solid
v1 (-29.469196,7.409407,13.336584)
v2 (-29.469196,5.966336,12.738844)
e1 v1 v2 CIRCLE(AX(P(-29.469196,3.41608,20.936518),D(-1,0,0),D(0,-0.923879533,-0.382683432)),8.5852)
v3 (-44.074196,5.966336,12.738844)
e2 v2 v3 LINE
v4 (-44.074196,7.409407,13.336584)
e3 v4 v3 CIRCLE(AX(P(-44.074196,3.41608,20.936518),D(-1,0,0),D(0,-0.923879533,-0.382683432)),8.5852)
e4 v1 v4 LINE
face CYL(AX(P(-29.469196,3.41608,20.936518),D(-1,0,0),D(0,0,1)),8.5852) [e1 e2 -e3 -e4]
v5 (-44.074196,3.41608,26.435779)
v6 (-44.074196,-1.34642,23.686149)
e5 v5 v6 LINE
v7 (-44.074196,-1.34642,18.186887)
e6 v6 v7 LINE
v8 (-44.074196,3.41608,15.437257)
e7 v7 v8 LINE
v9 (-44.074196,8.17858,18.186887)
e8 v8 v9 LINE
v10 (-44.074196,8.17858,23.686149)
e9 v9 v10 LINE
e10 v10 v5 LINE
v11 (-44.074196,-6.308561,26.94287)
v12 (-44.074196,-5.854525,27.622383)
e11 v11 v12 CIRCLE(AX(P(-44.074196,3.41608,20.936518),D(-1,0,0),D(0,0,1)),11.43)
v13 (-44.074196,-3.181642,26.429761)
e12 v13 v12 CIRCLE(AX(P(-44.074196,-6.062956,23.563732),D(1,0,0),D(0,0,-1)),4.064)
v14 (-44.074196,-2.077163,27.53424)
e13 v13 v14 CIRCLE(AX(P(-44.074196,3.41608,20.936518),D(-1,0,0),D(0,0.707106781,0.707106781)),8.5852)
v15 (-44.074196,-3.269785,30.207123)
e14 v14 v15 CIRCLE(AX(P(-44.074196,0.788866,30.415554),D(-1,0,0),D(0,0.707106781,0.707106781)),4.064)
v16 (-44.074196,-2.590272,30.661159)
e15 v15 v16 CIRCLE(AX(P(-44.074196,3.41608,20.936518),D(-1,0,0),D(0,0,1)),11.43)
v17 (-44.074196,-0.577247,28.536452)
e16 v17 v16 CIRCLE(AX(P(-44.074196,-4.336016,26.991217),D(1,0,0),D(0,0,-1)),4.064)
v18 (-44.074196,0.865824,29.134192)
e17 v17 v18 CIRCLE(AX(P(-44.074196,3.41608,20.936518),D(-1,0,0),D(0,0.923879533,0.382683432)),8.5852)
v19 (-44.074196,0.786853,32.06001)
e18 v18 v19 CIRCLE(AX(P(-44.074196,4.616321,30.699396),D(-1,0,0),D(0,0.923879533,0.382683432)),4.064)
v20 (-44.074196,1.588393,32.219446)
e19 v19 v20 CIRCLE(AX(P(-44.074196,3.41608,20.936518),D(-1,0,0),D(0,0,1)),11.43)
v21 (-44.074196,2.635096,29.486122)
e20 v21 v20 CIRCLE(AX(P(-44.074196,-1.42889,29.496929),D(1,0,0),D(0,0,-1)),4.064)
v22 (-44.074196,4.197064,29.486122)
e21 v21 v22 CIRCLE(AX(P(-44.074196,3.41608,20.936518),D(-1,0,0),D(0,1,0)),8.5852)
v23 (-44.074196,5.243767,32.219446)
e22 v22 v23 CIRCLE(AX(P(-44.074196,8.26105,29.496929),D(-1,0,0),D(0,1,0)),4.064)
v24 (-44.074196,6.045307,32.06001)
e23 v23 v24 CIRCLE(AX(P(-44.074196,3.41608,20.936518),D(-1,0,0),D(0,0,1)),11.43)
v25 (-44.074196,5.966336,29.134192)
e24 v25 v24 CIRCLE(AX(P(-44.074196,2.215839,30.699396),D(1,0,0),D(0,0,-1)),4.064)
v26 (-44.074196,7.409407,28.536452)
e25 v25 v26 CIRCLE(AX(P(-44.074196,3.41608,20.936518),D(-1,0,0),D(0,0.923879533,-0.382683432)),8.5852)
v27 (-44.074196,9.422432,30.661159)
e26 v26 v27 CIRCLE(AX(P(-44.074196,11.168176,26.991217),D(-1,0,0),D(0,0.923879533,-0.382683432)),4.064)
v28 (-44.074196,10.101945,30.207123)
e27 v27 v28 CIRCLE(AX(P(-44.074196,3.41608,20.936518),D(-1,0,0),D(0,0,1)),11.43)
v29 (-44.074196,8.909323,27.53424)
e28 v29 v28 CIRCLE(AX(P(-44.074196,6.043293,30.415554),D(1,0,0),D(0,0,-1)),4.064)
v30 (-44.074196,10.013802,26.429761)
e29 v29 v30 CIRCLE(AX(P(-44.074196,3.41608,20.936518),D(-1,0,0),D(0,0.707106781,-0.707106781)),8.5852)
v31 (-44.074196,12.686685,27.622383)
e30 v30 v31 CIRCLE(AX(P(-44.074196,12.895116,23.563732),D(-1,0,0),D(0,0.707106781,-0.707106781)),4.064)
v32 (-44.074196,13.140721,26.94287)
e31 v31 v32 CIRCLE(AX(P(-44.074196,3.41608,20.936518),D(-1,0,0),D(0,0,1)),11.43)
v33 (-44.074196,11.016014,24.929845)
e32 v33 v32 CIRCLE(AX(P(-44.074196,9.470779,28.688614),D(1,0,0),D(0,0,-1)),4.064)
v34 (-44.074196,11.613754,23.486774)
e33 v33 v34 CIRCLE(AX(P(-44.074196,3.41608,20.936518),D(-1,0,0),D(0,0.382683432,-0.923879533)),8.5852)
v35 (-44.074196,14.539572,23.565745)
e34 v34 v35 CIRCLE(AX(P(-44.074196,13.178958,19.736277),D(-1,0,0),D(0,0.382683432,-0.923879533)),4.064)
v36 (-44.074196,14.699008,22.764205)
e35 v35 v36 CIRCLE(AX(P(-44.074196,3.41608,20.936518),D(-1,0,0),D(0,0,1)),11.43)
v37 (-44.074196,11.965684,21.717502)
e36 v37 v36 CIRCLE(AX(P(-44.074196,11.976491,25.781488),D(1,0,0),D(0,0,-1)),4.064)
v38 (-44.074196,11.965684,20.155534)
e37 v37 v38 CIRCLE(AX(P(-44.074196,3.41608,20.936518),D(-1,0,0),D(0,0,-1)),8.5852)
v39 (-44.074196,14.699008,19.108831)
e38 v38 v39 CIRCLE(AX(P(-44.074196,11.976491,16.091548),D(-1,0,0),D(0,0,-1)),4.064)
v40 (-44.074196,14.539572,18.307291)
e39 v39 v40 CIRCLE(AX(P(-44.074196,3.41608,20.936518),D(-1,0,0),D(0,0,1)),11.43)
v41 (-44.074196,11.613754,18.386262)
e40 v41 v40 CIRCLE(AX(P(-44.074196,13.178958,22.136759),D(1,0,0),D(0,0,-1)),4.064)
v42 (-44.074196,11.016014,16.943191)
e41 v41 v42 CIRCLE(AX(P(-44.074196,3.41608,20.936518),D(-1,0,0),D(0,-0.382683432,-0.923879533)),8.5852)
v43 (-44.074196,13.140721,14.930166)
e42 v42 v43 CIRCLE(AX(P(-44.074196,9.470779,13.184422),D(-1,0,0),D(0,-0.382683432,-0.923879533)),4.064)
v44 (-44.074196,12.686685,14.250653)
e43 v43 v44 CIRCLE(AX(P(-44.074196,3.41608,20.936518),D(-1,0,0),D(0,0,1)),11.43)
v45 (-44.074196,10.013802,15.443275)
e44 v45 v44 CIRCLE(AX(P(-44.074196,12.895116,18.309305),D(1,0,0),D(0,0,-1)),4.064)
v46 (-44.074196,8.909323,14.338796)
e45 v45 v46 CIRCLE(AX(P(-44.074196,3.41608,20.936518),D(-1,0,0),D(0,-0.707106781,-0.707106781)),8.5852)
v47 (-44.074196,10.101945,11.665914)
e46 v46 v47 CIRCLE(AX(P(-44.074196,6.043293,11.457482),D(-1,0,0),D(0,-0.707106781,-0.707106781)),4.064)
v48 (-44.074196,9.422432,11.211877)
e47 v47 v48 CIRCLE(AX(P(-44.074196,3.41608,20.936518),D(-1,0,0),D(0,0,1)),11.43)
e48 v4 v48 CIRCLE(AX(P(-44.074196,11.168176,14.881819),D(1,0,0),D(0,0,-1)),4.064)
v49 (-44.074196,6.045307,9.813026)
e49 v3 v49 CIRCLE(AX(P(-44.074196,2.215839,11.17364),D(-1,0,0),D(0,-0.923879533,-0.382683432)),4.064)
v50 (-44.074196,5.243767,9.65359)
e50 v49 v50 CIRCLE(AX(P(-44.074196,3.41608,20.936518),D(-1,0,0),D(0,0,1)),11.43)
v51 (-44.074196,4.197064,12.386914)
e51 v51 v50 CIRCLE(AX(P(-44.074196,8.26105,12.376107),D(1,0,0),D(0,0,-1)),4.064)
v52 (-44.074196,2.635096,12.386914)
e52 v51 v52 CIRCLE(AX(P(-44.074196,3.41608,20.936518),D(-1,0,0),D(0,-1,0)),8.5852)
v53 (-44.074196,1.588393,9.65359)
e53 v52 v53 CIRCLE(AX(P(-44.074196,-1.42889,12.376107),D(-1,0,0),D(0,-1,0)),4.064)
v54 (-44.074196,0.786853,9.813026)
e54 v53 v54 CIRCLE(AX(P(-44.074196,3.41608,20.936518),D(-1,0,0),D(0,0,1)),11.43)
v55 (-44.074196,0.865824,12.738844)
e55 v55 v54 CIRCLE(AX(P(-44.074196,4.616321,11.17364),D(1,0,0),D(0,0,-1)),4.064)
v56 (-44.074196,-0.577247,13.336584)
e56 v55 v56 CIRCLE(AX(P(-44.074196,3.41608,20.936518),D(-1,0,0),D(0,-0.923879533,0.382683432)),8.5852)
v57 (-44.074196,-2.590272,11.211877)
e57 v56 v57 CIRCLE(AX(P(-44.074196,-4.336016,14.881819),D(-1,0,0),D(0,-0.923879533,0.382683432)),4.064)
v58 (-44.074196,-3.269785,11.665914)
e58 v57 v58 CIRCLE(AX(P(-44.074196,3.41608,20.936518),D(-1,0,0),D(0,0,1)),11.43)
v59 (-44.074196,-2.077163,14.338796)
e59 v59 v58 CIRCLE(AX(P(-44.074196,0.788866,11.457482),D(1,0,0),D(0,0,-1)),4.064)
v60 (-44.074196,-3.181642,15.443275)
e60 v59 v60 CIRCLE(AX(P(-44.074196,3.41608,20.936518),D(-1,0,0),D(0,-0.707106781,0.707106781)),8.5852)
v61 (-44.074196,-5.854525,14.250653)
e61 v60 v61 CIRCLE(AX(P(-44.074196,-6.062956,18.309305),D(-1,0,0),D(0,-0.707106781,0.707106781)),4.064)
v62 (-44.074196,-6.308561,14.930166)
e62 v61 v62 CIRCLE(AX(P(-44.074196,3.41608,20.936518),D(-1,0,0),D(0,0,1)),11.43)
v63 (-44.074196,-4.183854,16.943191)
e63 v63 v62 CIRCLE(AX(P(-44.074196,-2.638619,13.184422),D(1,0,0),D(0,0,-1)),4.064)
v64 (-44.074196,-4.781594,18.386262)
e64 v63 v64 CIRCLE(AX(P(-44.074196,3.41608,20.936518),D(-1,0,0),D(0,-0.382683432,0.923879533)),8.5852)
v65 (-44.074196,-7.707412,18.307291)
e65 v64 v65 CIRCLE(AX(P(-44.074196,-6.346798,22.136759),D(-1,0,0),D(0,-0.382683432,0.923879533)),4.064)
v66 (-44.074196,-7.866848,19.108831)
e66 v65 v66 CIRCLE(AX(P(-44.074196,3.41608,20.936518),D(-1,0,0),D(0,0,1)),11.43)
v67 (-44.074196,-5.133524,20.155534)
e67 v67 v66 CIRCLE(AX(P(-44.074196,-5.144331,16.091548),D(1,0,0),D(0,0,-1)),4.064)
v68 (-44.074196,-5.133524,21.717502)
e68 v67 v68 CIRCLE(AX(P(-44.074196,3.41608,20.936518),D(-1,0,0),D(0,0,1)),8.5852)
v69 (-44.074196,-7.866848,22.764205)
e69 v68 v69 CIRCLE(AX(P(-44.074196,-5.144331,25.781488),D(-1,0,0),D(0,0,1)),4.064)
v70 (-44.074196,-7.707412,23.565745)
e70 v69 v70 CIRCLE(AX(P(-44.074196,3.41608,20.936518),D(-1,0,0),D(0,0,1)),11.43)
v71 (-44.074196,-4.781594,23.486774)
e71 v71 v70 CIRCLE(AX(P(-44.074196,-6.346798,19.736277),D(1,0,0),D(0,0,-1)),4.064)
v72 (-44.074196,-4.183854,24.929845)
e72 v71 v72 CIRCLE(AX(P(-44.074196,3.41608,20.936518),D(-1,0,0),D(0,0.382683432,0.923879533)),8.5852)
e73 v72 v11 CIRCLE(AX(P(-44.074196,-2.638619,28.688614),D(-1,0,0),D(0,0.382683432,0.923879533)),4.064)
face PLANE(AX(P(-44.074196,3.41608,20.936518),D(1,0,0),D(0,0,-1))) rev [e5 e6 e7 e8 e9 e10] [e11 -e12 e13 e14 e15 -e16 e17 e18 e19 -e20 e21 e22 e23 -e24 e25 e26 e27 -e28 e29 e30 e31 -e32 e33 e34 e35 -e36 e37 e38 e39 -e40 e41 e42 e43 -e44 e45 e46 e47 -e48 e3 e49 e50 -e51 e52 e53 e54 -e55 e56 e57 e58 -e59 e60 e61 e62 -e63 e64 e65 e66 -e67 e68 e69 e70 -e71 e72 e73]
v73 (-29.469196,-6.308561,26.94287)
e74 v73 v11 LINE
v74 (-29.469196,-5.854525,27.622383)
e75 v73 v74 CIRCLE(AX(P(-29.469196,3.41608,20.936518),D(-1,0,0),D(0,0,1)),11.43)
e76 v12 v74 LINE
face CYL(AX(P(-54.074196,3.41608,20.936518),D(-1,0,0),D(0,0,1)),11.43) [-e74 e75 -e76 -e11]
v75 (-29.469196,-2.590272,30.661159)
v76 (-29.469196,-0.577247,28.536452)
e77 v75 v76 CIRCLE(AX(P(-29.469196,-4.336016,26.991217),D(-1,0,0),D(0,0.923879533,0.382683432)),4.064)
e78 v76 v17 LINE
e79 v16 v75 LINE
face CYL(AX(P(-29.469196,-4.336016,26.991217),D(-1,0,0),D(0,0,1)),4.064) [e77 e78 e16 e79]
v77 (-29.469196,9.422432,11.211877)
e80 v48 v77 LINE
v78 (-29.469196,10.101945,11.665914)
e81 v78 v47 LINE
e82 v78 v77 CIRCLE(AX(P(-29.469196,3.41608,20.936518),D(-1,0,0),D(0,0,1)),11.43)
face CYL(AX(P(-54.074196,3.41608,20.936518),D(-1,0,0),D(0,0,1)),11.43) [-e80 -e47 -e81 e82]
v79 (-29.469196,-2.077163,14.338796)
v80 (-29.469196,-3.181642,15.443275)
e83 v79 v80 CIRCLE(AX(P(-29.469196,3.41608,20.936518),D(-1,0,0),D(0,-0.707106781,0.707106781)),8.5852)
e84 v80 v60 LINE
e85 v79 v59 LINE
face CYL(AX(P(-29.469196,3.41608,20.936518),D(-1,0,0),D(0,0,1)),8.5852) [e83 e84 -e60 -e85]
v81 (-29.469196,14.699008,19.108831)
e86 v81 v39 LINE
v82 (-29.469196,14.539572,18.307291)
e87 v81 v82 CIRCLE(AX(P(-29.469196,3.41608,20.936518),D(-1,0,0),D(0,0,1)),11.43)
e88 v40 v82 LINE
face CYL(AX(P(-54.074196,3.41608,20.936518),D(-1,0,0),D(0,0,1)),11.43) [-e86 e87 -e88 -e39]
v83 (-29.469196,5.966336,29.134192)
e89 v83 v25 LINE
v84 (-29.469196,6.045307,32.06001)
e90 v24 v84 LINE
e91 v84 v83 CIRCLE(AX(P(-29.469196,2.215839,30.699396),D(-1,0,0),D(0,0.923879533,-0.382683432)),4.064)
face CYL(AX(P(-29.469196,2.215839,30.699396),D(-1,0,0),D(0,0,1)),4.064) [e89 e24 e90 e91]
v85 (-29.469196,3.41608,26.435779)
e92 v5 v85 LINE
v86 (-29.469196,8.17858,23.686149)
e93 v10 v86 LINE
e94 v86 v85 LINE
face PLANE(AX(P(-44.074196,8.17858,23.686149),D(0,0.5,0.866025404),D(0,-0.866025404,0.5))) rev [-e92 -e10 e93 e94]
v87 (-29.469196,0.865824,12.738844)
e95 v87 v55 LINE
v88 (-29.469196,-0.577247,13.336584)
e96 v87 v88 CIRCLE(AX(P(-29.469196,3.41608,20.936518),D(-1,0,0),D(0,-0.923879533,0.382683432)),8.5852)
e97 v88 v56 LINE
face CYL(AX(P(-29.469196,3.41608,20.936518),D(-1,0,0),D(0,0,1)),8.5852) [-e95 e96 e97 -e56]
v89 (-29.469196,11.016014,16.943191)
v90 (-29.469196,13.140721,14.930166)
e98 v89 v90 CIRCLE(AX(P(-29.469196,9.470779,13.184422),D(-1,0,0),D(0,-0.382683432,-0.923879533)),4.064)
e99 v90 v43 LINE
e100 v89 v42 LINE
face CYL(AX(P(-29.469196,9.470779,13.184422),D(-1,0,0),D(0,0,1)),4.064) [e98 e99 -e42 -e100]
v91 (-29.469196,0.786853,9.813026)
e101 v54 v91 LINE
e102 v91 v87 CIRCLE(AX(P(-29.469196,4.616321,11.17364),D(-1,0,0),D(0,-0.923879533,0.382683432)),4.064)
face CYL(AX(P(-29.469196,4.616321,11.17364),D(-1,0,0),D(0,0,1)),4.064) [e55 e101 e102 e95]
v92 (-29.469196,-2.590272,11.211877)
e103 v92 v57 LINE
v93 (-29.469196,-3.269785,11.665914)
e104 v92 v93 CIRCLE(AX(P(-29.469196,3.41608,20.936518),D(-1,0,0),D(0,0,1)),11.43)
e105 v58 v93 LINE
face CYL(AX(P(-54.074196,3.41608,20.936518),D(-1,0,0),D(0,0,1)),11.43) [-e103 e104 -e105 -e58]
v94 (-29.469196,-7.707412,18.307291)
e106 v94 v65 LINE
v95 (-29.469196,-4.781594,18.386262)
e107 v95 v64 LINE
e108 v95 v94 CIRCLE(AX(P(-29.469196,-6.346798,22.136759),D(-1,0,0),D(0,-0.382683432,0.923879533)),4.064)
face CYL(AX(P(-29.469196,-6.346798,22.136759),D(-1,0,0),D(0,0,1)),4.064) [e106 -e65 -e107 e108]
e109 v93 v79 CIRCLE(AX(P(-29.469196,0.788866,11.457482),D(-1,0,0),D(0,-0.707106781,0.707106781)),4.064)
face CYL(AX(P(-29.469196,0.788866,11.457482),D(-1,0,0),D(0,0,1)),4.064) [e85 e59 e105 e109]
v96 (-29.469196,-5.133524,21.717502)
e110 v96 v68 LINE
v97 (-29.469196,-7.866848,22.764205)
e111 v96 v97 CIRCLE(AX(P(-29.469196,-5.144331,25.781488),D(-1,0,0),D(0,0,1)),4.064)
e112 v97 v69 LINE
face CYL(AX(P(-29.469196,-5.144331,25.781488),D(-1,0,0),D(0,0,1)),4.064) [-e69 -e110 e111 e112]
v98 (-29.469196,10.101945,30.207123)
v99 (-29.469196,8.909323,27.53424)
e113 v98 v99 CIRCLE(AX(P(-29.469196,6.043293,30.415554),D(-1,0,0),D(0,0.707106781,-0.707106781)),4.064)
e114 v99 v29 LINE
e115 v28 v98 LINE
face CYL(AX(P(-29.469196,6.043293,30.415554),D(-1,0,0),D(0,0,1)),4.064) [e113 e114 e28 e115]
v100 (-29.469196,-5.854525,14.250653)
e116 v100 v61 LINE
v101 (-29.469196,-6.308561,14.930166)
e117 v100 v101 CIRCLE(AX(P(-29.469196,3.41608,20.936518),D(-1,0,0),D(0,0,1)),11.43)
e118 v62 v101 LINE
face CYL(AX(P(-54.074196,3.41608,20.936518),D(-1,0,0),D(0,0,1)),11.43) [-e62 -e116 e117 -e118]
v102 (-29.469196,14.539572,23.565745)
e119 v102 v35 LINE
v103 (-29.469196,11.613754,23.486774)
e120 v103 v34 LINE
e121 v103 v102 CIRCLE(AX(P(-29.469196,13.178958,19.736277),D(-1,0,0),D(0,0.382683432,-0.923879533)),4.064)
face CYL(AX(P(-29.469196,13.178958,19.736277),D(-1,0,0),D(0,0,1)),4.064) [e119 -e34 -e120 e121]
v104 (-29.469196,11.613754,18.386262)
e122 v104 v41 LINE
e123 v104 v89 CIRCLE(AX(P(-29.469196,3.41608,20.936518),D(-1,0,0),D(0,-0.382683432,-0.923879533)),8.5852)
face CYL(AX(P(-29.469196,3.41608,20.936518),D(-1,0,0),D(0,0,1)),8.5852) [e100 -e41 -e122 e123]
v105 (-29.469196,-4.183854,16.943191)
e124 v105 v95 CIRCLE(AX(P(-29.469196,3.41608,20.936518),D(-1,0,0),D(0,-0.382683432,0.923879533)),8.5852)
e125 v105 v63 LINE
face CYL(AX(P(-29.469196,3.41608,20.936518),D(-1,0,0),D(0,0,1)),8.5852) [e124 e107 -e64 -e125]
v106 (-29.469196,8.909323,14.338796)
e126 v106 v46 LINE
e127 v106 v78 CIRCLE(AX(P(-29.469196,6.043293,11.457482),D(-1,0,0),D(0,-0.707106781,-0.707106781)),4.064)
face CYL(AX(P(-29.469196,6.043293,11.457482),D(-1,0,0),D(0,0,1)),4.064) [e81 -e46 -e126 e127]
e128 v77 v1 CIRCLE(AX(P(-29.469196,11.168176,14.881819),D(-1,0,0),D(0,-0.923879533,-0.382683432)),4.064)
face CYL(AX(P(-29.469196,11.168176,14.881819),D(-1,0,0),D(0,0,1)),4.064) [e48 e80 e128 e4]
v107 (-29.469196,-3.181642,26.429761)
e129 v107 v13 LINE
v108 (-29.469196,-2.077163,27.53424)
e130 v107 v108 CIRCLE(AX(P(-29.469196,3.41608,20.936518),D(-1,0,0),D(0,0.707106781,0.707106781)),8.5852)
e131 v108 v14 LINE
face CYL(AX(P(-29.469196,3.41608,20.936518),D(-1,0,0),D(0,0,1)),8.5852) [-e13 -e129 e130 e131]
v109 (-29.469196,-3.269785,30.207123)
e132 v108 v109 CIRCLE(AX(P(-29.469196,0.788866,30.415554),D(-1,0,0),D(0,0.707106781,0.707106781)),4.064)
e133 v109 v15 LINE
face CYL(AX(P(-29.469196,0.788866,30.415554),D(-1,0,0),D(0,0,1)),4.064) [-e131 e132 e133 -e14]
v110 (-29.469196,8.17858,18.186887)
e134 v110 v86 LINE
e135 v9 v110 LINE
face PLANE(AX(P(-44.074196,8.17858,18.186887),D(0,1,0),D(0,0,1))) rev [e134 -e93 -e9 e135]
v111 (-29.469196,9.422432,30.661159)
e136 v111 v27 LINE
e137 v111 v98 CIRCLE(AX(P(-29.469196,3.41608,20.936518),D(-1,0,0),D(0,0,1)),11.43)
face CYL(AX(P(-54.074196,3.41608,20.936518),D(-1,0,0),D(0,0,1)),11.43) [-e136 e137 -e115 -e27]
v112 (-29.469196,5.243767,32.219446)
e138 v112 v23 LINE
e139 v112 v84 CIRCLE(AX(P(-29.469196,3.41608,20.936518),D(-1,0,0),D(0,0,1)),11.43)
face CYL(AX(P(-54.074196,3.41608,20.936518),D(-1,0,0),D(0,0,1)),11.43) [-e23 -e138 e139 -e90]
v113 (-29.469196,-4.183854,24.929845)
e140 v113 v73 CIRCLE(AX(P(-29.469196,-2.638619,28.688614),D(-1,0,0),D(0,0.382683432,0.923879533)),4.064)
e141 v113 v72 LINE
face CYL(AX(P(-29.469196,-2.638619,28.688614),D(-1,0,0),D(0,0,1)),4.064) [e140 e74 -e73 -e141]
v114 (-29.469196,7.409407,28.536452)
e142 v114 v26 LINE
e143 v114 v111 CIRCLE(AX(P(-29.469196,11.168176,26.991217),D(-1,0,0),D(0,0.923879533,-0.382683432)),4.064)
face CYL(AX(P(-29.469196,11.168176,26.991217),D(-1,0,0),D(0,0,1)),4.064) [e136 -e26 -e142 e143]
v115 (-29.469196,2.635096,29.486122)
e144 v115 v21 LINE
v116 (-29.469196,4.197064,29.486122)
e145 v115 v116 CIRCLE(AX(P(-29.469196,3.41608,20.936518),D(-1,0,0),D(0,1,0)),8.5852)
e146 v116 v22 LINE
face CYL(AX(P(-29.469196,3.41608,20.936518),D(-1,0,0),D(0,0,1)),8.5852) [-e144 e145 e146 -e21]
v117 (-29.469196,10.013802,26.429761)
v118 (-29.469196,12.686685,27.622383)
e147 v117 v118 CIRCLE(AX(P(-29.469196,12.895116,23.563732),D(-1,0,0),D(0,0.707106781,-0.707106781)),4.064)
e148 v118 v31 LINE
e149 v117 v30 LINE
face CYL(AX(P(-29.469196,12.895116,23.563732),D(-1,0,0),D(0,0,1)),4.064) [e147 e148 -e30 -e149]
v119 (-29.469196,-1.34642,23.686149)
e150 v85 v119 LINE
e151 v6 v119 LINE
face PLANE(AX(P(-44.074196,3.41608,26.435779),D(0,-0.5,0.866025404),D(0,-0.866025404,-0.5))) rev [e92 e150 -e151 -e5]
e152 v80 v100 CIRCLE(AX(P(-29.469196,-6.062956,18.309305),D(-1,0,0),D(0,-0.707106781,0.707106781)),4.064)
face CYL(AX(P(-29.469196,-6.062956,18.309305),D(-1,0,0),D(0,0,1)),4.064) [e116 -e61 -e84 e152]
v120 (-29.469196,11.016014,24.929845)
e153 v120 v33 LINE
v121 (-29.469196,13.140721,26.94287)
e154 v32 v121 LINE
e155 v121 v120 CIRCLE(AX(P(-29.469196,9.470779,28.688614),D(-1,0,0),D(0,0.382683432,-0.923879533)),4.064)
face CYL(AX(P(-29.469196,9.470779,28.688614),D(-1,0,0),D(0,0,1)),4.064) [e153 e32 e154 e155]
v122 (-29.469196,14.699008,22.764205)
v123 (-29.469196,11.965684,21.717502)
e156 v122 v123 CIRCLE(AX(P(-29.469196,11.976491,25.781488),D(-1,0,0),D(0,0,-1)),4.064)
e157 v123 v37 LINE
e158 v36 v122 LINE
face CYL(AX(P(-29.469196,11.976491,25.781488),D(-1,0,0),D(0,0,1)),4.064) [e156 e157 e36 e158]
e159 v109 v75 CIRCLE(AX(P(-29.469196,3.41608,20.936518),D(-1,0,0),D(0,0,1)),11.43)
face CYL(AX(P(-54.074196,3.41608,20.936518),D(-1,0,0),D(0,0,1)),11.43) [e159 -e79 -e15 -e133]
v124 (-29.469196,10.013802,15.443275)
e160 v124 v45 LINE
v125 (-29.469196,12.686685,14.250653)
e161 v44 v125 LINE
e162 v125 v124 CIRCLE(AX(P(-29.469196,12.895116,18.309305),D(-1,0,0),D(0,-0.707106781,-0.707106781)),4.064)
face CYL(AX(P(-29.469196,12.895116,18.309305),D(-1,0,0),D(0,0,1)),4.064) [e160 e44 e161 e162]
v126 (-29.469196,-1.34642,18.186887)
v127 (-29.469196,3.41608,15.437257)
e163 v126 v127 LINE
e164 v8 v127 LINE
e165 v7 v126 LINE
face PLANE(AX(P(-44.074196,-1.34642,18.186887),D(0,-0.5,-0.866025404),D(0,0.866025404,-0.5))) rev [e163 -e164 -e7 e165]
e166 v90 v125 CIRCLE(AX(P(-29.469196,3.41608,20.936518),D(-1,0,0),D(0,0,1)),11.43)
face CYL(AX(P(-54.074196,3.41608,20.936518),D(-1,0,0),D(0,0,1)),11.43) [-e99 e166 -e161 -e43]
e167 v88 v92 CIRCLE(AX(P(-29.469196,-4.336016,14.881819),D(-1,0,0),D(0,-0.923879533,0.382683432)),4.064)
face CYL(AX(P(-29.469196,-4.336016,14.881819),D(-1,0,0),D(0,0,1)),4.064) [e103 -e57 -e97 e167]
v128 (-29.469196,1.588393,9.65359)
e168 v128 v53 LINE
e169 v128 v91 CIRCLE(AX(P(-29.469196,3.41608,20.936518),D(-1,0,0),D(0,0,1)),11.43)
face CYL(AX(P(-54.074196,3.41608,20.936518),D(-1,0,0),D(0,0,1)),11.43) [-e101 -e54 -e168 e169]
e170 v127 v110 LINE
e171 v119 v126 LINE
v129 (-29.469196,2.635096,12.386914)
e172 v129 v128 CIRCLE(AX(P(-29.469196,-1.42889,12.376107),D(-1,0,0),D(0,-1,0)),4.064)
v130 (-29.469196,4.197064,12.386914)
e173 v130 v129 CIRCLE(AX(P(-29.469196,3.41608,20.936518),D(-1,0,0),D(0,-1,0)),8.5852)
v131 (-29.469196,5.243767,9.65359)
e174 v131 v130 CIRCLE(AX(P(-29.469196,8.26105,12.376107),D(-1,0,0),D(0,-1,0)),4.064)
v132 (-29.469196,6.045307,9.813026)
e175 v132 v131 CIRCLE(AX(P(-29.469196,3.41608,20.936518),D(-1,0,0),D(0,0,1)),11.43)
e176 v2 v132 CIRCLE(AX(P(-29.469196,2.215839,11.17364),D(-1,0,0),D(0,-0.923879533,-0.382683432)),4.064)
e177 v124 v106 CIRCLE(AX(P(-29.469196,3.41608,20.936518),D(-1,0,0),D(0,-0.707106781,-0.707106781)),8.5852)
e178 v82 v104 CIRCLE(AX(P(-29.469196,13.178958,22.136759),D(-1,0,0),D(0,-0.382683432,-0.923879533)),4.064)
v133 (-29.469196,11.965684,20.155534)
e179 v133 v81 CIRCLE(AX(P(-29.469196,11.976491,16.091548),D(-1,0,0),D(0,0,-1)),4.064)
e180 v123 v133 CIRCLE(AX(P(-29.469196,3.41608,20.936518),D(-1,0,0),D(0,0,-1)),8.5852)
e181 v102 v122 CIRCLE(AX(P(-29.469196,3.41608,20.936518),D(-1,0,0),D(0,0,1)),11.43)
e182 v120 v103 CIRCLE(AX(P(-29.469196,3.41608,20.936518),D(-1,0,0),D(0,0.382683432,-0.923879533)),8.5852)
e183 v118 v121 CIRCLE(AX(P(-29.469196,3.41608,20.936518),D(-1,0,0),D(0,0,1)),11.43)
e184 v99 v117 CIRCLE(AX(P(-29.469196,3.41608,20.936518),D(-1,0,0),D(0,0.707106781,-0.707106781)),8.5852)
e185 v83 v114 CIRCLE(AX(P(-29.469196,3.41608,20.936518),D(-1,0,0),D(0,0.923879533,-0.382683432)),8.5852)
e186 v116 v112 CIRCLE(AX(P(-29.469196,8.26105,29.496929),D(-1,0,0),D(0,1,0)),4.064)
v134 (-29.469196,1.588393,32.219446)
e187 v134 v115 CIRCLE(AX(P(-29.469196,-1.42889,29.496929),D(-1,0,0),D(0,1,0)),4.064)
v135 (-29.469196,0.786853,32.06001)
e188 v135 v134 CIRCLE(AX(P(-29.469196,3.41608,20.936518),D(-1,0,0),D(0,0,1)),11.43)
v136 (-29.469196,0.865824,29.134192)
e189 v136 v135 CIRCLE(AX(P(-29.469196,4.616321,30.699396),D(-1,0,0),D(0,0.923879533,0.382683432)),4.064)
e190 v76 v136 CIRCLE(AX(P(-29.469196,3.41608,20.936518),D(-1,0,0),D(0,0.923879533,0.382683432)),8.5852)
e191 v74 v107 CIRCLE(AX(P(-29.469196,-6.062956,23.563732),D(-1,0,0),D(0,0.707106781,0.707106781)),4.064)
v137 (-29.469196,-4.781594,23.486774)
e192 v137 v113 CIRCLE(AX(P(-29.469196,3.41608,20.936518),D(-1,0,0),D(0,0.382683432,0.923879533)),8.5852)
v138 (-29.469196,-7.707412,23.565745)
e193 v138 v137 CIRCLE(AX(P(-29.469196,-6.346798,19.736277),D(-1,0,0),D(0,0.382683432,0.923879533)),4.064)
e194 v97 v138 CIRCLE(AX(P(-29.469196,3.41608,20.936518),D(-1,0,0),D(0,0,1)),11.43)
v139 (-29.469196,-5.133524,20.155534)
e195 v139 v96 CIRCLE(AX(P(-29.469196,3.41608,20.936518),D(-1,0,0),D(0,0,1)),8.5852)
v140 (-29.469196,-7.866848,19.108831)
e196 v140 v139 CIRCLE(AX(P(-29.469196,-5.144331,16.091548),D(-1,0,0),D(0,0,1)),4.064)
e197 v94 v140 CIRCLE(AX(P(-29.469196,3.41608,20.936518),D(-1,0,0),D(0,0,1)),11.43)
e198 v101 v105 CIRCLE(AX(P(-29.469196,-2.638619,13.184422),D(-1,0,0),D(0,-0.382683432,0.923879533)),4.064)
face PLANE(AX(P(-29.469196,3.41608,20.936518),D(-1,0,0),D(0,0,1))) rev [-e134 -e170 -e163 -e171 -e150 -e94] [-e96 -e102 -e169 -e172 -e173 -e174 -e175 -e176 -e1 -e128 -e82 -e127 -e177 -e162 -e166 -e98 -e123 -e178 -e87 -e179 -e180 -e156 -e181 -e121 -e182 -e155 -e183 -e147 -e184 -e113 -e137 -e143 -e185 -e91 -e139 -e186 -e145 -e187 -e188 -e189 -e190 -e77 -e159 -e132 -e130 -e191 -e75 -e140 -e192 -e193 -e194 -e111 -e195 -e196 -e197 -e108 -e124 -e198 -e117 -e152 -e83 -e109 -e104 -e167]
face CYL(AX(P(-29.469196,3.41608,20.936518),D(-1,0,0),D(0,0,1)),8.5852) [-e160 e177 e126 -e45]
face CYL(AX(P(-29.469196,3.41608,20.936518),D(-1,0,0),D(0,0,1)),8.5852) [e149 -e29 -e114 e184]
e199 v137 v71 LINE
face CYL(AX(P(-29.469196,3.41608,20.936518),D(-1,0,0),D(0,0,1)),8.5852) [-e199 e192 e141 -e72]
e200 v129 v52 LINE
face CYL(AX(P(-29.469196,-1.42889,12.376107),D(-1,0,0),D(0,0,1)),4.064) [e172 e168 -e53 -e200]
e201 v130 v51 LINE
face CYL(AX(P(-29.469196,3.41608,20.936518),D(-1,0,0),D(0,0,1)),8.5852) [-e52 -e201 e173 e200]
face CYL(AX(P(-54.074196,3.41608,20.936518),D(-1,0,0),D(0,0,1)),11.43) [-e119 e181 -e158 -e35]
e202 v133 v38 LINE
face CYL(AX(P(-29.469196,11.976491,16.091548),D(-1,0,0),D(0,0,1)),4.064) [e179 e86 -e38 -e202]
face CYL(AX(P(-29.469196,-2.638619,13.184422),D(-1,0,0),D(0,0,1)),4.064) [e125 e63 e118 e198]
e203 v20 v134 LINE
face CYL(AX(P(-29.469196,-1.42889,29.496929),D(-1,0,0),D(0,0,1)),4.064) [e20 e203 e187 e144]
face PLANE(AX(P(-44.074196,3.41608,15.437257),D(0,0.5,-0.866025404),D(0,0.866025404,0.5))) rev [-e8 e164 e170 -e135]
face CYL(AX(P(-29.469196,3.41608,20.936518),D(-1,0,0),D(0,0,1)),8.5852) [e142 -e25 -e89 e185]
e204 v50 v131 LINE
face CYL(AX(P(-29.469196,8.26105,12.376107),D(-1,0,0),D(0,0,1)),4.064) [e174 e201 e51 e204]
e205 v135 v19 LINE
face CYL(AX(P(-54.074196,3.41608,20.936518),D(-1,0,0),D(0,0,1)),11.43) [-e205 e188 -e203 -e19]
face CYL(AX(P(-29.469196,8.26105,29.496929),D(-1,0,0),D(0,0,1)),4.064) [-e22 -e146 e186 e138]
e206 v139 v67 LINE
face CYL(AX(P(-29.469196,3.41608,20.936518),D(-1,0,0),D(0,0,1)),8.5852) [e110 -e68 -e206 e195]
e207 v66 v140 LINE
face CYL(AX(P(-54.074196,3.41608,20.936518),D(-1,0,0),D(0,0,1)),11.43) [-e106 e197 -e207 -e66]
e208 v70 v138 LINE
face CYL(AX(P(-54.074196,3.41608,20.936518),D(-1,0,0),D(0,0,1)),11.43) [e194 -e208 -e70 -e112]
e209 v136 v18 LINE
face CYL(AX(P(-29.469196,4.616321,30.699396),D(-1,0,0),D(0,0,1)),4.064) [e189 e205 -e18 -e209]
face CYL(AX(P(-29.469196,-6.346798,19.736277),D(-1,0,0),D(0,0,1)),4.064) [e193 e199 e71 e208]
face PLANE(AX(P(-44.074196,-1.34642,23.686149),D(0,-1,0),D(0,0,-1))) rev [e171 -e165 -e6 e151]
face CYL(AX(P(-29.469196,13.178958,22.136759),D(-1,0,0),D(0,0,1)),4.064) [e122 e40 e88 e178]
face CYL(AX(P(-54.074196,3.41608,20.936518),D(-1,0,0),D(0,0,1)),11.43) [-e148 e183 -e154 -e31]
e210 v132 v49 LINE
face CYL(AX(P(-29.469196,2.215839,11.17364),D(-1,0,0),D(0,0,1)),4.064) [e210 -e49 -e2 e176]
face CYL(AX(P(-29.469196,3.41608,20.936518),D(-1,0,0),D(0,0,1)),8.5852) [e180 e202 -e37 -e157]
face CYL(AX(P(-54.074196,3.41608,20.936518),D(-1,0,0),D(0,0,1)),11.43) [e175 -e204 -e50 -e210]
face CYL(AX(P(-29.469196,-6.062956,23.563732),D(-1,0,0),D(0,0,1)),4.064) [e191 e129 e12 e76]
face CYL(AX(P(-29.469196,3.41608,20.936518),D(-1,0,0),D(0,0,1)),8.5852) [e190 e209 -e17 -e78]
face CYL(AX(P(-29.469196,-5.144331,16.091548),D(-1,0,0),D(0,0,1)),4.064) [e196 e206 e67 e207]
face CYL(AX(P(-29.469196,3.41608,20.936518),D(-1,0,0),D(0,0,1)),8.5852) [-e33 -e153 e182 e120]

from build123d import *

# Parameters (mm, degrees)
SPUR_START             = -44.074195703
SPUR_GEAR_AI_OUTLINE_R = 4.7625
SPUR_GEAR_AI_DEPTH     = 14.605
CUT_EXTRUDE1_DEPTH     = 39.307434666


# Read off the part's stored shape, not the designer's step: spur gear_ai
with BuildPart() as part:
    # spur gear_ai outline → spur gear_ai (new body)
    with BuildSketch(Plane.YZ.offset(SPUR_START)):
        with BuildLine():
            ThreePointArc((12.686684526, 14.250652999), (12.919777657, 14.586350288), (13.140720632, 14.930166051))
            ThreePointArc((13.140720632, 14.930166051), (12.265878987, 16.134593199), (11.016013995, 16.943190851))
            ThreePointArc((11.016013995, 16.943190851), (11.347770551, 17.651104248), (11.613753604, 18.386261921))
            ThreePointArc((11.613753604, 18.386261921), (13.069306498, 18.074238793), (14.539571561, 18.307290937))
            ThreePointArc((14.539571561, 18.307290937), (14.626455743, 18.70663567), (14.699007839, 19.108831233))
            ThreePointArc((14.699007839, 19.108831233), (13.429845234, 19.88678942), (11.965683625, 20.155533616))
            ThreePointArc((11.965683625, 20.155533616), (12.001279988, 20.936518051), (11.965683625, 21.717502486))
            ThreePointArc((11.965683625, 21.717502486), (13.429845234, 21.986246682), (14.699007839, 22.764204869))
            ThreePointArc((14.699007839, 22.764204869), (14.626455743, 23.166400432), (14.539571561, 23.565745165))
            ThreePointArc((14.539571561, 23.565745165), (13.069306498, 23.79879731), (11.613753604, 23.486774182))
            ThreePointArc((11.613753604, 23.486774182), (11.347770551, 24.221931855), (11.016013995, 24.929845251))
            ThreePointArc((11.016013995, 24.929845251), (12.265878987, 25.738442903), (13.140720632, 26.942870051))
            ThreePointArc((13.140720632, 26.942870051), (12.919777657, 27.286685815), (12.686684526, 27.622383104))
            ThreePointArc((12.686684526, 27.622383104), (11.239151532, 27.275049128), (10.013802086, 26.42976137))
            ThreePointArc((10.013802086, 26.42976137), (9.486733126, 27.007171189), (8.909323306, 27.534240149))
            ThreePointArc((8.909323306, 27.534240149), (9.754611065, 28.759589595), (10.10194504, 30.207122589))
            ThreePointArc((10.10194504, 30.207122589), (9.766247751, 30.44021572), (9.422431988, 30.661158695))
            ThreePointArc((9.422431988, 30.661158695), (8.21800484, 29.78631705), (7.409407188, 28.536452058))
            ThreePointArc((7.409407188, 28.536452058), (6.701493792, 28.868208614), (5.966336119, 29.134191667))
            ThreePointArc((5.966336119, 29.134191667), (6.278359246, 30.589744561), (6.045307102, 32.060009624))
            ThreePointArc((6.045307102, 32.060009624), (5.645962369, 32.146893806), (5.243766806, 32.219445902))
            ThreePointArc((5.243766806, 32.219445902), (4.465808619, 30.950283297), (4.197064423, 29.486121688))
            ThreePointArc((4.197064423, 29.486121688), (3.416079988, 29.521718051), (2.635095553, 29.486121688))
            ThreePointArc((2.635095553, 29.486121688), (2.366351357, 30.950283297), (1.58839317, 32.219445902))
            ThreePointArc((1.58839317, 32.219445902), (1.186197607, 32.146893806), (0.786852874, 32.060009624))
            ThreePointArc((0.786852874, 32.060009624), (0.55380073, 30.589744561), (0.865823857, 29.134191667))
            ThreePointArc((0.865823857, 29.134191667), (0.130666184, 28.868208614), (-0.577247212, 28.536452058))
            ThreePointArc((-0.577247212, 28.536452058), (-1.385844864, 29.78631705), (-2.590272012, 30.661158695))
            ThreePointArc((-2.590272012, 30.661158695), (-2.934087775, 30.44021572), (-3.269785064, 30.207122589))
            ThreePointArc((-3.269785064, 30.207122589), (-2.922451089, 28.759589595), (-2.07716333, 27.534240149))
            ThreePointArc((-2.07716333, 27.534240149), (-2.65457315, 27.007171189), (-3.18164211, 26.42976137))
            ThreePointArc((-3.18164211, 26.42976137), (-4.406991556, 27.275049128), (-5.85452455, 27.622383104))
            ThreePointArc((-5.85452455, 27.622383104), (-6.087617681, 27.286685815), (-6.308560656, 26.942870051))
            ThreePointArc((-6.308560656, 26.942870051), (-5.43371901, 25.738442903), (-4.183854019, 24.929845251))
            ThreePointArc((-4.183854019, 24.929845251), (-4.515610574, 24.221931855), (-4.781593628, 23.486774182))
            ThreePointArc((-4.781593628, 23.486774182), (-6.237146522, 23.79879731), (-7.707411585, 23.565745165))
            ThreePointArc((-7.707411585, 23.565745165), (-7.794295767, 23.166400432), (-7.866847863, 22.764204869))
            ThreePointArc((-7.866847863, 22.764204869), (-6.597685258, 21.986246682), (-5.133523649, 21.717502486))
            ThreePointArc((-5.133523649, 21.717502486), (-5.169120012, 20.936518051), (-5.133523649, 20.155533616))
            ThreePointArc((-5.133523649, 20.155533616), (-6.597685258, 19.88678942), (-7.866847863, 19.108831233))
            ThreePointArc((-7.866847863, 19.108831233), (-7.794295767, 18.70663567), (-7.707411585, 18.307290937))
            ThreePointArc((-7.707411585, 18.307290937), (-6.237146522, 18.074238793), (-4.781593628, 18.386261921))
            ThreePointArc((-4.781593628, 18.386261921), (-4.515610574, 17.651104248), (-4.183854019, 16.943190851))
            ThreePointArc((-4.183854019, 16.943190851), (-5.43371901, 16.134593199), (-6.308560656, 14.930166051))
            ThreePointArc((-6.308560656, 14.930166051), (-6.087617681, 14.586350288), (-5.85452455, 14.250652999))
            ThreePointArc((-5.85452455, 14.250652999), (-4.406991556, 14.597986974), (-3.18164211, 15.443274733))
            ThreePointArc((-3.18164211, 15.443274733), (-2.65457315, 14.865864913), (-2.07716333, 14.338795953))
            ThreePointArc((-2.07716333, 14.338795953), (-2.922451089, 13.113446507), (-3.269785064, 11.665913513))
            ThreePointArc((-3.269785064, 11.665913513), (-2.934087775, 11.432820383), (-2.590272012, 11.211877407))
            ThreePointArc((-2.590272012, 11.211877407), (-1.385844864, 12.086719053), (-0.577247212, 13.336584044))
            ThreePointArc((-0.577247212, 13.336584044), (0.130666184, 13.004827489), (0.865823857, 12.738844436))
            ThreePointArc((0.865823857, 12.738844436), (0.55380073, 11.283291542), (0.786852874, 9.813026478))
            ThreePointArc((0.786852874, 9.813026478), (1.186197607, 9.726142296), (1.58839317, 9.6535902))
            ThreePointArc((1.58839317, 9.6535902), (2.366351357, 10.922752805), (2.635095553, 12.386914414))
            ThreePointArc((2.635095553, 12.386914414), (3.416079988, 12.351318051), (4.197064423, 12.386914414))
            ThreePointArc((4.197064423, 12.386914414), (4.465808619, 10.922752805), (5.243766806, 9.6535902))
            ThreePointArc((5.243766806, 9.6535902), (5.645962369, 9.726142296), (6.045307102, 9.813026478))
            ThreePointArc((6.045307102, 9.813026478), (6.278359246, 11.283291542), (5.966336119, 12.738844436))
            ThreePointArc((5.966336119, 12.738844436), (6.701493792, 13.004827489), (7.409407188, 13.336584044))
            ThreePointArc((7.409407188, 13.336584044), (8.21800484, 12.086719053), (9.422431988, 11.211877407))
            ThreePointArc((9.422431988, 11.211877407), (9.766247751, 11.432820383), (10.10194504, 11.665913513))
            ThreePointArc((10.10194504, 11.665913513), (9.754611065, 13.113446507), (8.909323306, 14.338795953))
            ThreePointArc((8.909323306, 14.338795953), (9.486733126, 14.865864913), (10.013802086, 15.443274733))
            ThreePointArc((10.013802086, 15.443274733), (11.239151532, 14.597986974), (12.686684526, 14.250652999))
        make_face()
        with Locations((3.416079988, 20.936518051)):
            Circle(SPUR_GEAR_AI_OUTLINE_R, mode=Mode.SUBTRACT)
    extrude(amount=SPUR_GEAR_AI_DEPTH)

    # Sketch1 → Cut-Extrude1 (cut, through all)
    with BuildSketch(Plane(origin=(-29.469195703, 0, 0), x_dir=(0, 0, -1), z_dir=(1, 0, 0))):
        Polygon((-18.186887394, 8.178579988), (-23.686148708, 8.178579988), (-26.435779365, 3.416079988), (-23.686148708, -1.346420012), (-18.186887394, -1.346420012), (-15.437256737, 3.416079988), align=None)
    extrude(amount=-CUT_EXTRUDE1_DEPTH, mode=Mode.SUBTRACT)


solid = part.part
